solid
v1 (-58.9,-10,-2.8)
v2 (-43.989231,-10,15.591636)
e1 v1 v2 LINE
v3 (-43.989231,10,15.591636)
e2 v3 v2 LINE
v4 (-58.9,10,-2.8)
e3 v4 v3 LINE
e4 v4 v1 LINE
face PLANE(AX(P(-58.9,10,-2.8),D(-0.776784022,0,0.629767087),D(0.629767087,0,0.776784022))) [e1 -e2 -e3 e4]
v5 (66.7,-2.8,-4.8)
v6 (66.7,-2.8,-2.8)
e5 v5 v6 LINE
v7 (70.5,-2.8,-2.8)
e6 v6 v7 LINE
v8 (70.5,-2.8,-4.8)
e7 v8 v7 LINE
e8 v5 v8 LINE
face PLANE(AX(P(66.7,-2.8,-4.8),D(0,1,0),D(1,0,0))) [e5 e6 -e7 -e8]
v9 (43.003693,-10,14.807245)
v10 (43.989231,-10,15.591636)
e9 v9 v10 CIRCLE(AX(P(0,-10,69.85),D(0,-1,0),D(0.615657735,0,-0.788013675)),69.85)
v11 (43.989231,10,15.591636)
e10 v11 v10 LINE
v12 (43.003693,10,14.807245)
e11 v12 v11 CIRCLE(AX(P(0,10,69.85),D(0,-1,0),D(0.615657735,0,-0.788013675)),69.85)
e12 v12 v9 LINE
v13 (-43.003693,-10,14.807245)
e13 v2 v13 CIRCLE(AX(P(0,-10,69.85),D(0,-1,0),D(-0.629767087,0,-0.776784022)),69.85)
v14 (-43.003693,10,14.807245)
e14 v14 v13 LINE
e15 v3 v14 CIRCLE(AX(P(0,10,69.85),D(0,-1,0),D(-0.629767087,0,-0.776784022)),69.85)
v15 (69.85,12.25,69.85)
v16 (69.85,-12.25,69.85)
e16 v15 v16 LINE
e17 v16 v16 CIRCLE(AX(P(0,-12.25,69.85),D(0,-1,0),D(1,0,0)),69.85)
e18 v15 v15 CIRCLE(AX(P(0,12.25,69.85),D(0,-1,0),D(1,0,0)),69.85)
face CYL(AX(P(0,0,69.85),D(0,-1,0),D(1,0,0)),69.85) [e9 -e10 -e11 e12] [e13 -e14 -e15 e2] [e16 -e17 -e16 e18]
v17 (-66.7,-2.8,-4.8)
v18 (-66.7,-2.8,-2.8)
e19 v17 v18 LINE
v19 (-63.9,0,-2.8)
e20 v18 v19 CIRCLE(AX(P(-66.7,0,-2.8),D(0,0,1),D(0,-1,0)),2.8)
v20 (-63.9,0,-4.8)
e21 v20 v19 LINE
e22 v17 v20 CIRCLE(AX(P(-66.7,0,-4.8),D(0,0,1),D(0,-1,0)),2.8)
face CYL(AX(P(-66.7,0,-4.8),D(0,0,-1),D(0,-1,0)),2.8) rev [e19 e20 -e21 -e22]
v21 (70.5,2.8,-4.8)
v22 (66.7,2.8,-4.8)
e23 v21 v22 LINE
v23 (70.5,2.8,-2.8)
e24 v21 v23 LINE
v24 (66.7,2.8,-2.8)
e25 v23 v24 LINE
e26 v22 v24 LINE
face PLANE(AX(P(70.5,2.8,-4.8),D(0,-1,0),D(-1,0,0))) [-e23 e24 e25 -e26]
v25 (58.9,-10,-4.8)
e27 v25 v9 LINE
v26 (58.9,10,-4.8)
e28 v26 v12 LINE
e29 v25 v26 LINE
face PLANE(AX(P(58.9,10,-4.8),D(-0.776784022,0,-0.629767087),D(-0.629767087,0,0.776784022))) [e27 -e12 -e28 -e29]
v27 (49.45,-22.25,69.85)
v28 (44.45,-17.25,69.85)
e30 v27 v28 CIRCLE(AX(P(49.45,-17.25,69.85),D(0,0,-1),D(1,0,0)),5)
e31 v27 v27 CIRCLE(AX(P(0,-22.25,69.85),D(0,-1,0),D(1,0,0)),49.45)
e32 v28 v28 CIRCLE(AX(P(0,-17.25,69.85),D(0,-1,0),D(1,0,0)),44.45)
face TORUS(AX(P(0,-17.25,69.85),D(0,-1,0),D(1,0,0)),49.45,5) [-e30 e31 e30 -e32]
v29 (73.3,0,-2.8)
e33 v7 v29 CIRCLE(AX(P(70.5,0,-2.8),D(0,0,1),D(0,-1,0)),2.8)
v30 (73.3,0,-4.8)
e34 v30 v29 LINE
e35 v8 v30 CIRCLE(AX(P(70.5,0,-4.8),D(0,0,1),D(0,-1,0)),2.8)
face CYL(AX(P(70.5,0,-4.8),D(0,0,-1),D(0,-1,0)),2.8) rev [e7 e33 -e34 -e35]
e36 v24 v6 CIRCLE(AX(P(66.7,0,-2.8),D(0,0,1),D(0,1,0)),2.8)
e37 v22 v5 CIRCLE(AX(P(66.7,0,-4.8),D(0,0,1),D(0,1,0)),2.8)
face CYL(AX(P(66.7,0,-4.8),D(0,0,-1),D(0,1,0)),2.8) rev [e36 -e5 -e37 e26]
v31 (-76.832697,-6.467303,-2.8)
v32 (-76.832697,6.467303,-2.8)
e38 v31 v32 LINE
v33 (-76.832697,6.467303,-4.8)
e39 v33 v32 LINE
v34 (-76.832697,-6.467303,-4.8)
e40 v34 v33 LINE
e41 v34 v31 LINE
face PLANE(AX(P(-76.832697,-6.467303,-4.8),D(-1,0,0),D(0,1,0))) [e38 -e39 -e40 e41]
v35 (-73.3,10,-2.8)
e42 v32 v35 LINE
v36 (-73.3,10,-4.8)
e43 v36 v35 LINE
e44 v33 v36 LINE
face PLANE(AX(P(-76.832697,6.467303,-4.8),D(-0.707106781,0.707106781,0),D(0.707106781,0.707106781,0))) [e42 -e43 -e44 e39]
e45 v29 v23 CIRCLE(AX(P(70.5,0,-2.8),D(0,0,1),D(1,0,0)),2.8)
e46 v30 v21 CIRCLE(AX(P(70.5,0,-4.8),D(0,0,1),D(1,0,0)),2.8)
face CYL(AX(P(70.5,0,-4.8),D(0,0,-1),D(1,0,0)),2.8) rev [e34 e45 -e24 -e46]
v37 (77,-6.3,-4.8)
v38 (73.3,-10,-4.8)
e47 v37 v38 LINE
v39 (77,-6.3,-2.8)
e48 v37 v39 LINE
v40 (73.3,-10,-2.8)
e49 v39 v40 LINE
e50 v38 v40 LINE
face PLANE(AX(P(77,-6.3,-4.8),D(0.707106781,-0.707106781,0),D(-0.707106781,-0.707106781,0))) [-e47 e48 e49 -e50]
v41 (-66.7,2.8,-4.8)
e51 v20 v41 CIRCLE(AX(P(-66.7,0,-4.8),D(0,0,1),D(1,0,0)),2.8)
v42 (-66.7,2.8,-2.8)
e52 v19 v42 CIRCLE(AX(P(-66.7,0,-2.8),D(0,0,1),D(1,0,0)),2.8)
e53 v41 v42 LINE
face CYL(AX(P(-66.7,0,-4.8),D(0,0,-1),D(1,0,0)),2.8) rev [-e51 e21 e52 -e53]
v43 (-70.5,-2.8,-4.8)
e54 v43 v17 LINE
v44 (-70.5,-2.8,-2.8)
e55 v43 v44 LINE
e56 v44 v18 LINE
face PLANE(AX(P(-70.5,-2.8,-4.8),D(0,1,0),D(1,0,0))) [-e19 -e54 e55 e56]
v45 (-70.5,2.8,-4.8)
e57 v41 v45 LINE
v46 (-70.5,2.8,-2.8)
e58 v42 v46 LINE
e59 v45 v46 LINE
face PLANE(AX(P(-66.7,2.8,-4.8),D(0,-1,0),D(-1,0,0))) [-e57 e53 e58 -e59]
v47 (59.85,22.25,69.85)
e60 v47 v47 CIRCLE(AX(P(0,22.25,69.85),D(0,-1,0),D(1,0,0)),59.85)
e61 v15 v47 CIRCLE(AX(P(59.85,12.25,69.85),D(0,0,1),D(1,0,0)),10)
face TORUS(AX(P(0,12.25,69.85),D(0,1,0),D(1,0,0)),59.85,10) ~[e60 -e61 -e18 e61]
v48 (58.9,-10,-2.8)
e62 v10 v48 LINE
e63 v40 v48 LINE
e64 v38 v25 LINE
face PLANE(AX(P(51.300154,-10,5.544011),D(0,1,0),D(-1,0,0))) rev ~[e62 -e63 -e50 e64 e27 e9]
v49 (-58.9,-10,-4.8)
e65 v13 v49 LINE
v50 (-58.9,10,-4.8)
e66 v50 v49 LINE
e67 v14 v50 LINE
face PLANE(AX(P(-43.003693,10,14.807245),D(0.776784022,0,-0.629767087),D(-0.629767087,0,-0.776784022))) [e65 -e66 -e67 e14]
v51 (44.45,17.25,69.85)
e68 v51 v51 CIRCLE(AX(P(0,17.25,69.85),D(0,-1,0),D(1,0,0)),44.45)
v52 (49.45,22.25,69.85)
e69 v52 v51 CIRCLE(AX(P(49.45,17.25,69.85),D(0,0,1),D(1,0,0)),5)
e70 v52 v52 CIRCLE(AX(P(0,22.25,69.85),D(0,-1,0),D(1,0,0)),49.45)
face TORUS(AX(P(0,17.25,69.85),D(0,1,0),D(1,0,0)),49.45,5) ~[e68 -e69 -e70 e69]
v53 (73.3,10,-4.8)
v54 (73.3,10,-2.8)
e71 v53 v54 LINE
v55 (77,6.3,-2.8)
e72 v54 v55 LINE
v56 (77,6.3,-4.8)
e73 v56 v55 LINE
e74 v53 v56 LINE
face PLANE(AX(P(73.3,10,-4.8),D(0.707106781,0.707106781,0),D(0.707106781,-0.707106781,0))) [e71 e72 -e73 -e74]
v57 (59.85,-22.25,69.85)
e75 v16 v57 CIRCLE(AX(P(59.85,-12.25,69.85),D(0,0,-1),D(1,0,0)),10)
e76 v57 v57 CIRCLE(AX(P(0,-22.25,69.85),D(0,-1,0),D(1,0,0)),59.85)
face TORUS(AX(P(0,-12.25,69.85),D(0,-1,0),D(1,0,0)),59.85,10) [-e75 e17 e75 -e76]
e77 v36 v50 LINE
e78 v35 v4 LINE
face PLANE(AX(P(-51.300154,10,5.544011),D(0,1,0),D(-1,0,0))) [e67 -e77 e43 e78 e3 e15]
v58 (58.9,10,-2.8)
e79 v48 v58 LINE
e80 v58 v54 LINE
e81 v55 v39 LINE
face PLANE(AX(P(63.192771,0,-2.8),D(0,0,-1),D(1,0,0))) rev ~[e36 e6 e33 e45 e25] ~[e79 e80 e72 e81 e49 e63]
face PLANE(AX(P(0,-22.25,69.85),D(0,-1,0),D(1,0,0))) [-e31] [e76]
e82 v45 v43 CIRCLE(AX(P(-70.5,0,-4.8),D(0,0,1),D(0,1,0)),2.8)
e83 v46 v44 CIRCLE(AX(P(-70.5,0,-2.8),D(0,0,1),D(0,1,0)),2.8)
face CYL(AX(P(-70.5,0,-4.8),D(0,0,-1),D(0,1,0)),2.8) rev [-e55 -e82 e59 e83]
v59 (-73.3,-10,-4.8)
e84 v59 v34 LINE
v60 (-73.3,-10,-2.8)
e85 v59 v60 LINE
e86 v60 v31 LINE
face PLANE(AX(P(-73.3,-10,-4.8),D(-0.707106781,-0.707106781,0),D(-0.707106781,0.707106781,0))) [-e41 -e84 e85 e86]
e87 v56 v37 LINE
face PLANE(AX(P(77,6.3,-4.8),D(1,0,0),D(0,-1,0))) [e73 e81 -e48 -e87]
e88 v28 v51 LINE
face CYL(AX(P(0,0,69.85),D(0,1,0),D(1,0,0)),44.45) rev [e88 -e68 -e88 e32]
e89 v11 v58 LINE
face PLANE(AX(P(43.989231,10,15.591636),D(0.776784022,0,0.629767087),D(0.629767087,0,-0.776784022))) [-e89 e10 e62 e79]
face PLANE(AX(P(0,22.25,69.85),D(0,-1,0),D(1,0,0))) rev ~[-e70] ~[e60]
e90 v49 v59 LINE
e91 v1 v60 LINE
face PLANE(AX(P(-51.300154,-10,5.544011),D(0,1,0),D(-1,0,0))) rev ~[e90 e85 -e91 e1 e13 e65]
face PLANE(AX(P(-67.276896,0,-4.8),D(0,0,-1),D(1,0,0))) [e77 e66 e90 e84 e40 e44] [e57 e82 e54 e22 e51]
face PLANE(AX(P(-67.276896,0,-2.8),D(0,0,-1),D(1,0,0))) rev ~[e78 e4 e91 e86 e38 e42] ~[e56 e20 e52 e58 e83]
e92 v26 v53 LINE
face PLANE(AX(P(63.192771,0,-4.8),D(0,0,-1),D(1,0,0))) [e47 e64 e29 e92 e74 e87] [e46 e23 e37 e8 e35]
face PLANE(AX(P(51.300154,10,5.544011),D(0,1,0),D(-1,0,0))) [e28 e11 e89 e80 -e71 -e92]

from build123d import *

# Parameters (mm, degrees)
F0_R     = 69.85
F0_R_2   = 44.45
F1_DEPTH = 22.25
F2_R     = 10
F3_R     = 5
F7_DEPTH = 2
F9_DEPTH = 20


with BuildPart() as f1:
    # F0 (on Front) → F1 (new body, symmetric)
    with BuildSketch(Plane.XZ):
        with Locations((0, 69.85)):
            Circle(F0_R)
        with Locations((0, 69.85)):
            Circle(F0_R_2, mode=Mode.SUBTRACT)
    extrude(amount=F1_DEPTH, both=True)

    # F2
    f2_edges = [f1.edges().sort_by_distance(p)[0] for p in [
        (-69.85, -22.25, 69.85),
        (-69.85, 22.25, 69.85),
    ]]
    fillet(f2_edges, radius=F2_R)

    # F3
    f3_edges = [f1.edges().sort_by_distance(p)[0] for p in [
        (-44.45, 22.25, 69.85),
        (-44.45, -22.25, 69.85),
    ]]
    fillet(f3_edges, radius=F3_R)



with BuildPart() as f7:
    # F5 (on face) → F7 (new body)
    with BuildSketch(Plane(origin=(0, 0, -4.8), x_dir=(1, 0, 0), z_dir=(0, 0, -1))):
        with BuildLine():
            Line((58.9, 10), (58.9, -10))
            Line((58.9, -10), (67.5496086478, -10))
            Line((67.5496086478, -10), (67.5496086478, -2.8))
            Line((67.5496086478, -2.8), (66.7, -2.8))
            ThreePointArc((66.7, -2.8), (63.9, 0), (66.7, 2.8))
            Line((66.7, 2.8), (67.5496086478, 2.8))
            Line((67.5496086478, 2.8), (67.5496086478, 10))
            Line((67.5496086478, 10), (58.9, 10))
        make_face()
        with BuildLine():
            Line((67.5496086478, -2.8), (67.5496086478, -10))
            Line((67.5496086478, -10), (73.3, -10))
            Line((73.3, -10), (77, -6.3))
            Line((77, -6.3), (77, 6.3))
            Line((77, 6.3), (73.3, 10))
            Line((73.3, 10), (67.5496086478, 10))
            Line((67.5496086478, 10), (67.5496086478, 2.8))
            Line((67.5496086478, 2.8), (70.5, 2.8))
            ThreePointArc((70.5, 2.8), (72.4798989873, 1.9798989873), (73.3, 0))
            ThreePointArc((73.3, 0), (72.4798989873, -1.9798989873), (70.5, -2.8))
            Line((70.5, -2.8), (67.5496086478, -2.8))
        make_face()
    extrude(amount=-F7_DEPTH)


with BuildPart() as f7b:
    # F5 (on face) → F7, piece 2 (new body)
    with BuildSketch(Plane(origin=(0, 0, -4.8), x_dir=(1, 0, 0), z_dir=(0, 0, -1))):
        Polygon((-76.8326967955, 6.4673032045), (-76.8326967955, -6.4673032045), (-73.3, -10), (-58.9, -10), (-58.9, 10), (-73.3, 10), align=None)
        with BuildLine():
            ThreePointArc((-70.5, -2.8), (-73.3, 0), (-70.5, 2.8))
            Line((-70.5, 2.8), (-66.7, 2.8))
            ThreePointArc((-66.7, 2.8), (-64.7201010127, 1.9798989873), (-63.9, 0))
            ThreePointArc((-63.9, 0), (-64.7201010127, -1.9798989873), (-66.7, -2.8))
            Line((-66.7, -2.8), (-70.5, -2.8))
        make_face(mode=Mode.SUBTRACT)
    extrude(amount=-F7_DEPTH)


with BuildPart() as f1_1:
    add(f1.part)

    add(f7.part)  # F9 merges F7

    add(f7b.part)  # F9 merges F7b
    # F8 (on face) → F9 (join, through all)
    with BuildSketch(Plane(origin=(0, 10, 0), x_dir=(-1, 0, 0), z_dir=(0, 1, 0))):
        with BuildLine():
            Line((58.9, -2.8), (43.9892310261, 15.5916360942))
            ThreePointArc((43.9892310261, 15.5916360942), (43.4982300473, 15.1972188928), (43.0036928197, 14.8072447649))
            Line((43.0036928197, 14.8072447649), (58.9, -4.8))
            Line((58.9, -4.8), (58.9, -2.8))
        make_face()
        with BuildLine():
            ThreePointArc((-43.0036928197, 14.8072447649), (-43.4982300473, 15.1972188928), (-43.9892310261, 15.5916360942))
            Line((-43.9892310261, 15.5916360942), (-58.9, -2.8))
            Line((-58.9, -2.8), (-58.9, -4.8))
            Line((-58.9, -4.8), (-43.0036928197, 14.8072447649))
        make_face()
    extrude(amount=-F9_DEPTH)


solid = f1_1.part
